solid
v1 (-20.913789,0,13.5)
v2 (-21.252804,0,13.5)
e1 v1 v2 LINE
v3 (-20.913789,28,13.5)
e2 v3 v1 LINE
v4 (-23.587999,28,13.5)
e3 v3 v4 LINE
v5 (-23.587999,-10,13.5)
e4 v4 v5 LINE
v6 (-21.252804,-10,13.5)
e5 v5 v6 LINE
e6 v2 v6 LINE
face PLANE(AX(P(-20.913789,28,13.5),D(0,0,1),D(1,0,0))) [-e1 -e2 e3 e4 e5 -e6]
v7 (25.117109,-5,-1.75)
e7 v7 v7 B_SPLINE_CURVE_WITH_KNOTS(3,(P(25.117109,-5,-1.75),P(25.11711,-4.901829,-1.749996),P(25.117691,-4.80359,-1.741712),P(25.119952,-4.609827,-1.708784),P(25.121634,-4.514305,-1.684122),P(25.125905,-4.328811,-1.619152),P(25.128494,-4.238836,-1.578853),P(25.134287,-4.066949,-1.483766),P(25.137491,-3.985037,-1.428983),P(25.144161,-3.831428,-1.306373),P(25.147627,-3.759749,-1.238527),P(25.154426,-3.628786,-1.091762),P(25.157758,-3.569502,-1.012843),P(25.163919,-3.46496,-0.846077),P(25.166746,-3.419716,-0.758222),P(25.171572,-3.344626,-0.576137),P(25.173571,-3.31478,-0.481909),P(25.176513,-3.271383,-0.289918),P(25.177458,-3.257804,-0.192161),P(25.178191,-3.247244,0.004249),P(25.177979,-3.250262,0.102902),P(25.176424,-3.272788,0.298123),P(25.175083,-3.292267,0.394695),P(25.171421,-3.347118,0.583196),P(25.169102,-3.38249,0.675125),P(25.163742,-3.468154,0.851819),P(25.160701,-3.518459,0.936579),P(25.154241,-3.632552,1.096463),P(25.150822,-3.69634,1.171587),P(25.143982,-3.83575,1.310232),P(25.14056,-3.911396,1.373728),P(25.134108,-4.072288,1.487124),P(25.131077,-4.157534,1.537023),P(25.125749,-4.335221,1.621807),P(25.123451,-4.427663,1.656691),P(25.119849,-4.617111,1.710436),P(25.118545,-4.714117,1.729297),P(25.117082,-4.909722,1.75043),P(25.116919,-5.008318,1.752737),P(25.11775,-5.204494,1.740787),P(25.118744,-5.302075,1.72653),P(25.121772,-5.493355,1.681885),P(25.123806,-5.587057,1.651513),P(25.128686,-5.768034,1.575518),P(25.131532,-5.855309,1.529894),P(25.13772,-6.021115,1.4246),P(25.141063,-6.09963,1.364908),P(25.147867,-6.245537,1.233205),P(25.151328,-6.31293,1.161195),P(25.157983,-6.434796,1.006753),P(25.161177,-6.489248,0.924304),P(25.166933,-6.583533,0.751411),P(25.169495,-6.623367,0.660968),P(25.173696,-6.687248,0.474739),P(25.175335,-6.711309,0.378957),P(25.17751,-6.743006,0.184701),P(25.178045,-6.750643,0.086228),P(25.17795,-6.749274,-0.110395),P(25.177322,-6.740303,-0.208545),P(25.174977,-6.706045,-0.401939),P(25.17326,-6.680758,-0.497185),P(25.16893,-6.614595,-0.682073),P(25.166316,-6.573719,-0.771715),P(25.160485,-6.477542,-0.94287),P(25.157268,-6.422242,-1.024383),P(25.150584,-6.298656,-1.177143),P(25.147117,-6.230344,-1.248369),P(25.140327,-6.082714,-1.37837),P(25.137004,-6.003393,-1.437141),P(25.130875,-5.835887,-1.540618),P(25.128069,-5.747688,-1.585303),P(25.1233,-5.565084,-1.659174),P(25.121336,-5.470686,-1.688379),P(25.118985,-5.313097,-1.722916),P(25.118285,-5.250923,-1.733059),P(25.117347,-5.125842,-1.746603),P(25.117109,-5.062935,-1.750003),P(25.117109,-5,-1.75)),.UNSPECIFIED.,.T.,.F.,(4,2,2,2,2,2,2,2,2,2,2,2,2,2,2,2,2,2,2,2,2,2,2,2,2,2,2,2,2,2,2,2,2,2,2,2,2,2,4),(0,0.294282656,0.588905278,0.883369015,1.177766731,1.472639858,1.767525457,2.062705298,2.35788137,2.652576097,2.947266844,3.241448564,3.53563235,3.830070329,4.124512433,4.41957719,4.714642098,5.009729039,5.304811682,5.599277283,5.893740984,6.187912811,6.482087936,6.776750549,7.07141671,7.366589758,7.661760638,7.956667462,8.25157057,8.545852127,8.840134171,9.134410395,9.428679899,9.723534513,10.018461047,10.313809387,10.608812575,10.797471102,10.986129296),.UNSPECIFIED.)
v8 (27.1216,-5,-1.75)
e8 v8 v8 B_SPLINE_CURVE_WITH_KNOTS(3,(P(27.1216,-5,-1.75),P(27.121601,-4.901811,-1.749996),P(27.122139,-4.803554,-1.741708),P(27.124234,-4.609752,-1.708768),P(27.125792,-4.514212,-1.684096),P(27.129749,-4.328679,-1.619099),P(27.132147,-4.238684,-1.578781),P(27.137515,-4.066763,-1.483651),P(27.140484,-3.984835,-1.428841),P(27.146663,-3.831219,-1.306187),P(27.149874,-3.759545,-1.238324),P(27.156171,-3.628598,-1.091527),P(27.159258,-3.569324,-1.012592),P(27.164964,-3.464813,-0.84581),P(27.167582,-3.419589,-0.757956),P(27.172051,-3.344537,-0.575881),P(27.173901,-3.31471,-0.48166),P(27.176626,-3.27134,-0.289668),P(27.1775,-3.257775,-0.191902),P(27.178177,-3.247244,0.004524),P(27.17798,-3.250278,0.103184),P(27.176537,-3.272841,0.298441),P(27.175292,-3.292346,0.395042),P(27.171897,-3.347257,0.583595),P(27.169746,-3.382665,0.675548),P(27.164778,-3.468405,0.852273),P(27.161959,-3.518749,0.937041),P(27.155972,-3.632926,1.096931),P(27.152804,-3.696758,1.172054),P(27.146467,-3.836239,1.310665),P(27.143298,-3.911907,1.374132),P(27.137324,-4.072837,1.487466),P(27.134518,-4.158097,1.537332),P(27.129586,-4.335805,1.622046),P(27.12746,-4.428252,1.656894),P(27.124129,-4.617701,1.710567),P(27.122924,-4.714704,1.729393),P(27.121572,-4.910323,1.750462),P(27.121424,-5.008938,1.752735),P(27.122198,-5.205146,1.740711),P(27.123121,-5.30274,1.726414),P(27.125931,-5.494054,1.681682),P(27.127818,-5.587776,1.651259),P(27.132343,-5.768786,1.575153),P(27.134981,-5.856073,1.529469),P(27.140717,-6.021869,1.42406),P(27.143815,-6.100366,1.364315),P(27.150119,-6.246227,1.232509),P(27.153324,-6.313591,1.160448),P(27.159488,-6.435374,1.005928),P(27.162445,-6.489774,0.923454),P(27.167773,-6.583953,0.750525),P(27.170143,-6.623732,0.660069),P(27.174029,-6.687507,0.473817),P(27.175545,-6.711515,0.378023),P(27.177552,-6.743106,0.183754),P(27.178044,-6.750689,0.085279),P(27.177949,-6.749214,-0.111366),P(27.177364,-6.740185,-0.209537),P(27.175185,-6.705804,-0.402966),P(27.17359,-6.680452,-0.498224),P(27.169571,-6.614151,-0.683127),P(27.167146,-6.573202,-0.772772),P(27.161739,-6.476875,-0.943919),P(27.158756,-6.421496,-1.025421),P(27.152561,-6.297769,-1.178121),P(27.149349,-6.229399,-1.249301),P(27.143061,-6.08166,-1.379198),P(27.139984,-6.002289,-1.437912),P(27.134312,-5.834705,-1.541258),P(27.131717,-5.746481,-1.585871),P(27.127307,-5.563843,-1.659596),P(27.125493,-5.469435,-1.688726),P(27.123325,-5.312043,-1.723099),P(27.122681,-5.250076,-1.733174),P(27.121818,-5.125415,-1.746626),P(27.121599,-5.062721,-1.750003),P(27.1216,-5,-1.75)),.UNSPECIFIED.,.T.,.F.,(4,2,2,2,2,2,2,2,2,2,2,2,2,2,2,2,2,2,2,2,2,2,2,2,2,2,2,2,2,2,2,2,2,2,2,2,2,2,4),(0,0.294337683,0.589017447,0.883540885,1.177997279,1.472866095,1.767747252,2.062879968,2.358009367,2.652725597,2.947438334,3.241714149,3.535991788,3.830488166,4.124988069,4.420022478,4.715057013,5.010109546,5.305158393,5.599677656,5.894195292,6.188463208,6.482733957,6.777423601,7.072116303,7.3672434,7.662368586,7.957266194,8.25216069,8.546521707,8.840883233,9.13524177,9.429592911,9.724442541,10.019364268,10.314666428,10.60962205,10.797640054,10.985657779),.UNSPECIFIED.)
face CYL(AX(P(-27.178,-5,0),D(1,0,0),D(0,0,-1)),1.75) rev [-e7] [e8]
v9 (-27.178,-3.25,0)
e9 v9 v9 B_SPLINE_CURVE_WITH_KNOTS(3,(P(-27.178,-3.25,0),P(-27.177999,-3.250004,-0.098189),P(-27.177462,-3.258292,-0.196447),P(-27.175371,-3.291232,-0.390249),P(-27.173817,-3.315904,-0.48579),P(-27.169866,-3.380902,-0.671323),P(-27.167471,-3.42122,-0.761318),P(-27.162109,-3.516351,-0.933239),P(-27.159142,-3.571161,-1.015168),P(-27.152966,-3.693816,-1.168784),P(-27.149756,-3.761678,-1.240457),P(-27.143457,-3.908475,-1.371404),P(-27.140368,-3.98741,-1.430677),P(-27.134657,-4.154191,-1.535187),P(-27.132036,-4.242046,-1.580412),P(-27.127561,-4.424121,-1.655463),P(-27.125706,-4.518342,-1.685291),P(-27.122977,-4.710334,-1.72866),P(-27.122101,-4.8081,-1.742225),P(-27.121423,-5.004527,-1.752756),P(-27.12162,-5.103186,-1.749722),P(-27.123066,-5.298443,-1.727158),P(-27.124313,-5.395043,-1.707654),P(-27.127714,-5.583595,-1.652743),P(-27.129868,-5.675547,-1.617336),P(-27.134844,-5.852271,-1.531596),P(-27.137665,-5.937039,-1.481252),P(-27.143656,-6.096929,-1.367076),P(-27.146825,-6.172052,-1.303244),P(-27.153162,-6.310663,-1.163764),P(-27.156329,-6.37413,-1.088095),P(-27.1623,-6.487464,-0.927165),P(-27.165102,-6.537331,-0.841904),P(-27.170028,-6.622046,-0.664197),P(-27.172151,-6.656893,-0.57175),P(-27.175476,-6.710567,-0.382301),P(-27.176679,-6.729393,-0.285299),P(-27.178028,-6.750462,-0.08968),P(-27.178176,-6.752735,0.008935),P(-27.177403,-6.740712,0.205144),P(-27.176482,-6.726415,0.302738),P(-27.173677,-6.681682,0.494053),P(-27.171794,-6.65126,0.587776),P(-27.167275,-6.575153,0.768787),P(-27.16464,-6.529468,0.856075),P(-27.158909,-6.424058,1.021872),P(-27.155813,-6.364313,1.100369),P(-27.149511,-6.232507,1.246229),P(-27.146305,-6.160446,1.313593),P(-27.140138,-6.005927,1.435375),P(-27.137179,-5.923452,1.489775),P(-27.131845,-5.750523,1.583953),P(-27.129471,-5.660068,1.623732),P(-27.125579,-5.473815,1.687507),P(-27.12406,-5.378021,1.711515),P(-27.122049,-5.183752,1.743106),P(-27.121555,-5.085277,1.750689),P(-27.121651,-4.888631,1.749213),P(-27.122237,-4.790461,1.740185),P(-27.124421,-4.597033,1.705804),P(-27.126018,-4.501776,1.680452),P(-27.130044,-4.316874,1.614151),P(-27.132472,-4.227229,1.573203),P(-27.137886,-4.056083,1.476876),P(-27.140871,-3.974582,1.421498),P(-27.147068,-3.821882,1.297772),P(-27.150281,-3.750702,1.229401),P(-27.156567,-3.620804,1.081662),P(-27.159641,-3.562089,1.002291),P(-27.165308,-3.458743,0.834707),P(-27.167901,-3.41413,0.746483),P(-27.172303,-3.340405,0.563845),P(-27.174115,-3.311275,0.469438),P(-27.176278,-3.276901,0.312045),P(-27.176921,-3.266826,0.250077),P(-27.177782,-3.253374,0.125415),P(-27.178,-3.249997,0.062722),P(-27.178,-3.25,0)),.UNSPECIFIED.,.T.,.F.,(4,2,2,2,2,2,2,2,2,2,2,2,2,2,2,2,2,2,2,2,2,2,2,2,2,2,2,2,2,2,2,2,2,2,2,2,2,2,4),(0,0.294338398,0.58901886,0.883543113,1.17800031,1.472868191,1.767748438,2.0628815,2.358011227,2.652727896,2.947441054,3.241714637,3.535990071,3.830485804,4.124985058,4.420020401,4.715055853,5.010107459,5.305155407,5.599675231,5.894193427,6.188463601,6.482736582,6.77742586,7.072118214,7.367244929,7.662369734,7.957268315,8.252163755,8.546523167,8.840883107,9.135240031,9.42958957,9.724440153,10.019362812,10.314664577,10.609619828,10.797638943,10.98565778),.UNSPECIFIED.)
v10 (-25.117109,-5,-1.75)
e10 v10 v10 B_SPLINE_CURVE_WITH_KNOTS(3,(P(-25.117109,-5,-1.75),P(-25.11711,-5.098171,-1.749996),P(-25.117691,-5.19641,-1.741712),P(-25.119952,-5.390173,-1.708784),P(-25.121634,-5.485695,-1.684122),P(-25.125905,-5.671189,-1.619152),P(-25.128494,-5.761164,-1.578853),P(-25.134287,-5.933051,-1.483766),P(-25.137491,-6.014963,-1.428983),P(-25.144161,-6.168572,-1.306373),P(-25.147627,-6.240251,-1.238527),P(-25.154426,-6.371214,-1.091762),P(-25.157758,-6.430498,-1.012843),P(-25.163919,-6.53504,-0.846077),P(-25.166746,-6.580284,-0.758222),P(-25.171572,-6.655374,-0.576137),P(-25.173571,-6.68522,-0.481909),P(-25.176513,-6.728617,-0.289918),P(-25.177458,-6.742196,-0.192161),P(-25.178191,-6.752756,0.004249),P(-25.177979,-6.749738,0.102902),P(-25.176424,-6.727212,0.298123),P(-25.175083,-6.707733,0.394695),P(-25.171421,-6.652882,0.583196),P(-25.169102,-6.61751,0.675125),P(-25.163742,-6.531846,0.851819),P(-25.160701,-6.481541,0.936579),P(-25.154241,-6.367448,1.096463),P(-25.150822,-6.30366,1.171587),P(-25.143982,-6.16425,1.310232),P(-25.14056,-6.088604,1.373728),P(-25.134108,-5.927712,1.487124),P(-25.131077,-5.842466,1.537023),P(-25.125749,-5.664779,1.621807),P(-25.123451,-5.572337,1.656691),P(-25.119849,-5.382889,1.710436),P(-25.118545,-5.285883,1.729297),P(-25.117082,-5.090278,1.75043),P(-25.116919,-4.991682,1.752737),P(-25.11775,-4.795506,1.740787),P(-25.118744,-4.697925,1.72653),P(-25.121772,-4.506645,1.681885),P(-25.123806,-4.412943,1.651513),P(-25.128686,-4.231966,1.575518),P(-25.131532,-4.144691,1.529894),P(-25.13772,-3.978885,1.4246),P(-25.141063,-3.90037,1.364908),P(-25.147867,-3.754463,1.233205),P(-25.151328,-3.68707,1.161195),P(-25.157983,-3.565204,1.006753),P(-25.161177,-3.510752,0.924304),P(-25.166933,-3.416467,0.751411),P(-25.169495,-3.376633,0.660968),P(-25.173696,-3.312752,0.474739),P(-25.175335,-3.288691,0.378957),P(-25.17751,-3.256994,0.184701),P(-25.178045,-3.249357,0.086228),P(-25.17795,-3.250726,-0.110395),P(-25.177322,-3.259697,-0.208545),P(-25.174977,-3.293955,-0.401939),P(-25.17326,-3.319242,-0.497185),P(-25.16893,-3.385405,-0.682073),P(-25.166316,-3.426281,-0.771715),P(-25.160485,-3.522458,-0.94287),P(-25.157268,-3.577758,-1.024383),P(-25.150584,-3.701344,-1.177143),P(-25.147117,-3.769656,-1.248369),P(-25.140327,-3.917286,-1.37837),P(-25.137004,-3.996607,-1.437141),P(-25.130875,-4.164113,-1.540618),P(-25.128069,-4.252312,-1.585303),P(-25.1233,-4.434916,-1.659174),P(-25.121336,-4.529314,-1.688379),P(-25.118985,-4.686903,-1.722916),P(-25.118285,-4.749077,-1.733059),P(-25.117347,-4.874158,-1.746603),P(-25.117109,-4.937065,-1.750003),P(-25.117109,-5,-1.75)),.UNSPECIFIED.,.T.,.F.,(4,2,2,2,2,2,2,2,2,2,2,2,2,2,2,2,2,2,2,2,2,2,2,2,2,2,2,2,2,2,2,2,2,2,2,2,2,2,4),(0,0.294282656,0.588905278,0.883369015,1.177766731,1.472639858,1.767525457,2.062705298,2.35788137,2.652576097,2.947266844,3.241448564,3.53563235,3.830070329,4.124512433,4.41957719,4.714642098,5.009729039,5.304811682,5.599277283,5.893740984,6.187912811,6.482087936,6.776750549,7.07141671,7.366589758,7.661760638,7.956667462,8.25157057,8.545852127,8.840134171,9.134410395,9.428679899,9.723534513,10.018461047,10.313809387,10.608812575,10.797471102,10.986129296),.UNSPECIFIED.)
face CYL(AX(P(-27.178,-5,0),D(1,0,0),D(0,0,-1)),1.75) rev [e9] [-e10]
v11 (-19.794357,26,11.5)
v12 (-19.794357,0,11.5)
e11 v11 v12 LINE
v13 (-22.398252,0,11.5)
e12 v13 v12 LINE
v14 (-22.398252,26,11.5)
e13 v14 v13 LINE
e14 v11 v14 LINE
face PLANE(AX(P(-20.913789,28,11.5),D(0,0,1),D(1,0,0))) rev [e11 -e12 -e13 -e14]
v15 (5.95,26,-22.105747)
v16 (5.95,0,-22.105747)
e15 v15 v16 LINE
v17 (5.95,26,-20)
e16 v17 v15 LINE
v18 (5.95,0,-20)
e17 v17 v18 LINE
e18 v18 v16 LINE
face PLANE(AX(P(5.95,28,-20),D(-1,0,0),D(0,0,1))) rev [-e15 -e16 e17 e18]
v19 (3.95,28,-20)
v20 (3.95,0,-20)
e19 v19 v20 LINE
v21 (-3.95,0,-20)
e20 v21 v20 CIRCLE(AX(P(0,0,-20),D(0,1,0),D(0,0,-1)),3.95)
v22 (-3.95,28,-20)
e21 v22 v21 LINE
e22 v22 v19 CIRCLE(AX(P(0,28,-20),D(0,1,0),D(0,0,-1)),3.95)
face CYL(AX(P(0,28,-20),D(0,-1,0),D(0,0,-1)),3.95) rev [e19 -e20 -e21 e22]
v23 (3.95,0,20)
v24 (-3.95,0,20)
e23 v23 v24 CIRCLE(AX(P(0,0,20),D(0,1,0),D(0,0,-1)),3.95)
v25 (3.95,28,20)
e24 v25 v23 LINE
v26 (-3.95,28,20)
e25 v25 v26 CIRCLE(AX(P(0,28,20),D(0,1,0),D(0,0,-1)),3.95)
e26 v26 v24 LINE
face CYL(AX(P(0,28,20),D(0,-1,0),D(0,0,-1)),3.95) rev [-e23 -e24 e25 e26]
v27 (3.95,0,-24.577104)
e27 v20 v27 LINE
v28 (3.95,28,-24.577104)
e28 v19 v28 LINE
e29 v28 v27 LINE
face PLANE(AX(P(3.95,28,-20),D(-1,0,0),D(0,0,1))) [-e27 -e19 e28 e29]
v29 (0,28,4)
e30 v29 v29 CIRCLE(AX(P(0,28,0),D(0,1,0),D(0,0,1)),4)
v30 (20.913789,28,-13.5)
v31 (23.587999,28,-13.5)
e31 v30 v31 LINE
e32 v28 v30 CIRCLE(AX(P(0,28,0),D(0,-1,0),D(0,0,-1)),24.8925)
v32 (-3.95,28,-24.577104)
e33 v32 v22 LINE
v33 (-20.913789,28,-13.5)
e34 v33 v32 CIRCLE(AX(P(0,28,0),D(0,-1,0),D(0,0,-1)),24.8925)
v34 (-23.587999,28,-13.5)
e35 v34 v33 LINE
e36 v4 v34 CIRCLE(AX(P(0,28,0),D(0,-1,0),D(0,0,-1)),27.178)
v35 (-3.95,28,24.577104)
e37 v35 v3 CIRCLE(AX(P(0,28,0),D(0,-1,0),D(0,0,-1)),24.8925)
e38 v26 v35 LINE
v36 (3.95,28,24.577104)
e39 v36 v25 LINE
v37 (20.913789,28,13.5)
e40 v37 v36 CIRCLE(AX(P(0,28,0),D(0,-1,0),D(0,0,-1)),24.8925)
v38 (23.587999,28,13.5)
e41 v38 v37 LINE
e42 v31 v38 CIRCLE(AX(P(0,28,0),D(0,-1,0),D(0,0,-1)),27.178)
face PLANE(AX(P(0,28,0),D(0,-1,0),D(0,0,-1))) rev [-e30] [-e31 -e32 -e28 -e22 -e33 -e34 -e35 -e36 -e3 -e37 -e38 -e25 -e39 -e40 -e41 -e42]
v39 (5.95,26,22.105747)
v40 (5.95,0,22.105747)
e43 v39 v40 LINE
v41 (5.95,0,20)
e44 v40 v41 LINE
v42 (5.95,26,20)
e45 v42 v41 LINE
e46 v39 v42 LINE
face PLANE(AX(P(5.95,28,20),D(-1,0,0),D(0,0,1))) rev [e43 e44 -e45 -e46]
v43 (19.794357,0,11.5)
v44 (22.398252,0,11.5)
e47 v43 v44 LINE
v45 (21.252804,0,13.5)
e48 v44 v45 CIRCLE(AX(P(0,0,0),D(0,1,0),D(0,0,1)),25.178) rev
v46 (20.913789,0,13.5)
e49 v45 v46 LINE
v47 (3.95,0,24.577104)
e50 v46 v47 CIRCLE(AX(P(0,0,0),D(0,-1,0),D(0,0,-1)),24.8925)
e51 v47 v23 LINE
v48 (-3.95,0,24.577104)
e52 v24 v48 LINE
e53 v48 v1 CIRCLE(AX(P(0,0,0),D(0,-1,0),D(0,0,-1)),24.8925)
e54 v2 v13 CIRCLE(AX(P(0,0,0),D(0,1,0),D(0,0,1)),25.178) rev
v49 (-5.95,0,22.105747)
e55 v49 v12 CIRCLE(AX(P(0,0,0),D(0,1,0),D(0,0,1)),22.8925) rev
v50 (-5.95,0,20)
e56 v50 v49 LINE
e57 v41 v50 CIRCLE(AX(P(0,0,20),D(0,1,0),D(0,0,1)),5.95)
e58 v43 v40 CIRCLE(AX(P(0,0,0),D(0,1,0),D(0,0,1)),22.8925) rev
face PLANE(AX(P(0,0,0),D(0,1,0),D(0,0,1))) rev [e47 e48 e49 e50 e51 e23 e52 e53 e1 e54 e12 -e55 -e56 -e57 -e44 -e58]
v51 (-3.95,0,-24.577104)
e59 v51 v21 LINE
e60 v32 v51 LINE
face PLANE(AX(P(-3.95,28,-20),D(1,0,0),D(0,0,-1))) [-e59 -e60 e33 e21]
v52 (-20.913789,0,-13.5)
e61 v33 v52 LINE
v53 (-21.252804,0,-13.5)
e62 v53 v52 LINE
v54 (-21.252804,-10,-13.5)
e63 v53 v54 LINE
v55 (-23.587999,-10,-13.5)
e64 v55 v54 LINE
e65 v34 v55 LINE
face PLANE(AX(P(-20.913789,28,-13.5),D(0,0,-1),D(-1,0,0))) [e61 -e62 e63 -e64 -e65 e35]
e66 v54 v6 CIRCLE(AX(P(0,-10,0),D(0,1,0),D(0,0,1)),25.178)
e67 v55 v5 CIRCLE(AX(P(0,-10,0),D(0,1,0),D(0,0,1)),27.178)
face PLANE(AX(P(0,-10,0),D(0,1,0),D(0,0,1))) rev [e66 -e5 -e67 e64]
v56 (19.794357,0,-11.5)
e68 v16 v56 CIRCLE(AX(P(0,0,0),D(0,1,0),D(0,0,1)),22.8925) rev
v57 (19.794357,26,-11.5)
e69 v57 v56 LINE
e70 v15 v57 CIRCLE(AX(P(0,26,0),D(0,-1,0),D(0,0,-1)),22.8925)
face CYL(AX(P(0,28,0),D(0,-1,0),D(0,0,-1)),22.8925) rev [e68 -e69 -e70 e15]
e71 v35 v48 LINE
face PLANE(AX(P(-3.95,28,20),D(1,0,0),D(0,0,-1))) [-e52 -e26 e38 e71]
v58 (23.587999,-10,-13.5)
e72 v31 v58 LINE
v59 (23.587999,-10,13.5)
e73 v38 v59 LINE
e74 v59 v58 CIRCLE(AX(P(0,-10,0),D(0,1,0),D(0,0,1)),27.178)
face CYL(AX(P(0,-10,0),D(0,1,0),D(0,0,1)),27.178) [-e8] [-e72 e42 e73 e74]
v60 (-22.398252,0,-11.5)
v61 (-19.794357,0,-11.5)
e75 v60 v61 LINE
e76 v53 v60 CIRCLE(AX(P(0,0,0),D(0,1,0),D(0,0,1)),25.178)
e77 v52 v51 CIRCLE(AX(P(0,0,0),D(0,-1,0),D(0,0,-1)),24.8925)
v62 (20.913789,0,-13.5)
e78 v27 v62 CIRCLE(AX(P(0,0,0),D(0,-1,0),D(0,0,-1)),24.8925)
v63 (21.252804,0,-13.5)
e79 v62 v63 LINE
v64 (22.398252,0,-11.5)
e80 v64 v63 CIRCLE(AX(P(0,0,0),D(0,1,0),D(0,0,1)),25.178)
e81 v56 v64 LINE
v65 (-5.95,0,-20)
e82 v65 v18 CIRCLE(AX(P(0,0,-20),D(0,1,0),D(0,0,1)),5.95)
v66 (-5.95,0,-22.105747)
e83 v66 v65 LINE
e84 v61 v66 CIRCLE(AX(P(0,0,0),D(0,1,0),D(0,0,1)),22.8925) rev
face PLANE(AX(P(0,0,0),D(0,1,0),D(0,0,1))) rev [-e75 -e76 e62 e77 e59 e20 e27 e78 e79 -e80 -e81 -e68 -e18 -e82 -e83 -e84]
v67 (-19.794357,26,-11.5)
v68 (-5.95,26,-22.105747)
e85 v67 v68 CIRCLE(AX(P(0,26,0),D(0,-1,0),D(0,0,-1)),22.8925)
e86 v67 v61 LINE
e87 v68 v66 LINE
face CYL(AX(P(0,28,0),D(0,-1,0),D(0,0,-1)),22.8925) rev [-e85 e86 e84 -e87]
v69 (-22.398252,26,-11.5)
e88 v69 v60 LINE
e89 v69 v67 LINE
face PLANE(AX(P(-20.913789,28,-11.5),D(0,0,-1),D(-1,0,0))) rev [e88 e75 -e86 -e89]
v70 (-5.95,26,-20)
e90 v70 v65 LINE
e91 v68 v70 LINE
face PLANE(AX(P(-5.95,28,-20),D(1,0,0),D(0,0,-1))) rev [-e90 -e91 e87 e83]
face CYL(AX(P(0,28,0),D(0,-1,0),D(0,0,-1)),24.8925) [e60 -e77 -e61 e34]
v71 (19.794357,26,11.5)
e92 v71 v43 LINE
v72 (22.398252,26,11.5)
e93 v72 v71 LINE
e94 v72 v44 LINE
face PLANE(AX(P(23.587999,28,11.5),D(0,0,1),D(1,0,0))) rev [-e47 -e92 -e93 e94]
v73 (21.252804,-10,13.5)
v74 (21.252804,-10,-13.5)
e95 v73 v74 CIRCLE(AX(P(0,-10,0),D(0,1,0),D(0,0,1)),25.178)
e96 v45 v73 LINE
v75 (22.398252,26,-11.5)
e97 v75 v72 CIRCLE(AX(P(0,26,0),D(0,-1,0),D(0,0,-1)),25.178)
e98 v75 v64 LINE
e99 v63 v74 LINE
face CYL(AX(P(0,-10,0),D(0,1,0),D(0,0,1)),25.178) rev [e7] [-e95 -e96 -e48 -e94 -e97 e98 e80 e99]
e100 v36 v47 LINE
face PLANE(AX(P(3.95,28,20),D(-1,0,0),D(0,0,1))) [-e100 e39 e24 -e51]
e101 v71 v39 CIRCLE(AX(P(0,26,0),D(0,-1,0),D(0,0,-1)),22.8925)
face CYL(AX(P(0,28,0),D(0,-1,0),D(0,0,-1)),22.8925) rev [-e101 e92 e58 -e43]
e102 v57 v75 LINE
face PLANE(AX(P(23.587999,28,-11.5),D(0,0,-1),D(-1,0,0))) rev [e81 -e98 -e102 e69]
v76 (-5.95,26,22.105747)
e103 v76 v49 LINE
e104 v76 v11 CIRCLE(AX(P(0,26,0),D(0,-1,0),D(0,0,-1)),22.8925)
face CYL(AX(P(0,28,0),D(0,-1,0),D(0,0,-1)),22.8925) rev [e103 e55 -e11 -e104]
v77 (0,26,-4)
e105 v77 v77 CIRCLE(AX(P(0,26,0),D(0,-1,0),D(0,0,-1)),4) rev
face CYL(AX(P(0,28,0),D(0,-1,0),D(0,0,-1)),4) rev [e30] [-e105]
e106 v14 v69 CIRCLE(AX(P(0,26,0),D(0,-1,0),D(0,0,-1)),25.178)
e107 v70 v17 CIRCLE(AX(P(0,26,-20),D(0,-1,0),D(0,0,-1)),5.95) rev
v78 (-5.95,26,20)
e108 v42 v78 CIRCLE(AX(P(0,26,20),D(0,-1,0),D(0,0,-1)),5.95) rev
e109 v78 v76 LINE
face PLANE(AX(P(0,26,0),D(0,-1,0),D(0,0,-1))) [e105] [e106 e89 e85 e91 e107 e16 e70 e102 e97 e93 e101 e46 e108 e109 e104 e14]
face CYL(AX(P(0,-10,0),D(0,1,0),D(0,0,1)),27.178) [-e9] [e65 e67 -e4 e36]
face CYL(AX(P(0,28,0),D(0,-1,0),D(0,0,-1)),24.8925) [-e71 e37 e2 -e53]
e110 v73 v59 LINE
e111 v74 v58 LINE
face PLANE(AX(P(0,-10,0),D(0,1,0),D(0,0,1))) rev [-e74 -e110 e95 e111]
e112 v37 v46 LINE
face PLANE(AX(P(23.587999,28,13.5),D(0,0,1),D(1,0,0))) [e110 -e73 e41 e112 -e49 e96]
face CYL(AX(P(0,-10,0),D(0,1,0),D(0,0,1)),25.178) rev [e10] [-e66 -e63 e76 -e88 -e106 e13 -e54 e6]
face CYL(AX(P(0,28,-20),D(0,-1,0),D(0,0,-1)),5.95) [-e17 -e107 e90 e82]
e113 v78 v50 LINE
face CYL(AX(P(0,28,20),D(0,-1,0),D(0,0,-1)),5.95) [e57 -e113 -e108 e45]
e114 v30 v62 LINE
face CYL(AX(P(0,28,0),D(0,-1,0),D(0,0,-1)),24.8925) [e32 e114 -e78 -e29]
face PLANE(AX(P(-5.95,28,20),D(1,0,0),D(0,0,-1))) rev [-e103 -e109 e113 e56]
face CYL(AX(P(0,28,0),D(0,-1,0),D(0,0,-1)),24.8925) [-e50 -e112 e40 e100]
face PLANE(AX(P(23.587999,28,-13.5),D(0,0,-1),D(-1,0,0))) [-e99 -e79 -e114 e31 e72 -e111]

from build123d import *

# Parameters (mm, degrees)
SKETCH2_R               = 27.178
BOSS_EXTRUDE1_DEPTH     = 10
BOSS_EXTRUDE2_START     = -28
BOSS_EXTRUDE2_DEPTH     = 28
SHELL1_START            = -10
SHELL1_DEPTH            = 36
SHELL1_2_DEPTH          = 8
CUT_EXTRUDE3_DEPTH      = 10
CUT_EXTRUDE4_DEPTH      = 47.115916344
CUT_EXTRUDE4_DEPTH_BACK = 47.115916344
SKETCH6_R               = 1.75
SKETCH7_R               = 4
CUT_EXTRUDE6_DEPTH      = 47.115916478


# Read off the part's stored shape, not the designer's step: Shell1
with BuildPart() as part:
    # Sketch2 → Boss-Extrude1 (new body)
    with BuildSketch(Plane(origin=(0, 0, 0), x_dir=(1, 0, 0), z_dir=(0, 1, 0))):
        with Locations(Location((0, 0, 0), (0, 0, 270))):
            Circle(SKETCH2_R)
    extrude(amount=-BOSS_EXTRUDE1_DEPTH)

    # Sketch3 → Boss-Extrude2 (add)
    with BuildSketch(Plane(origin=(0, 0, 0), x_dir=(-1, 0, 0), z_dir=(0, -1, 0)).offset(BOSS_EXTRUDE2_START)):
        with BuildLine():
            Line((-23.587998728, 13.5), (-20.913788663, 13.5))
            ThreePointArc((-20.913788663, 13.5), (-13.609833087, 20.842480649), (-3.95, 24.57710431))
            Line((-3.95, 24.57710431), (-3.95, 20))
            ThreePointArc((-3.95, 20), (0, 16.05), (3.95, 20))
            Line((3.95, 20), (3.95, 24.57710431))
            ThreePointArc((3.95, 24.57710431), (13.609833087, 20.842480649), (20.913788663, 13.5))
            Line((20.913788663, 13.5), (23.587998728, 13.5))
            ThreePointArc((23.587998728, 13.5), (27.178, 0), (23.587998728, -13.5))
            Line((23.587998728, -13.5), (20.913788663, -13.5))
            ThreePointArc((20.913788663, -13.5), (13.609833087, -20.842480649), (3.95, -24.57710431))
            Line((3.95, -24.57710431), (3.95, -20))
            ThreePointArc((3.95, -20), (0, -16.05), (-3.95, -20))
            Line((-3.95, -20), (-3.95, -24.57710431))
            ThreePointArc((-3.95, -24.57710431), (-13.609833087, -20.842480649), (-20.913788663, -13.5))
            Line((-20.913788663, -13.5), (-23.587998728, -13.5))
            ThreePointArc((-23.587998728, -13.5), (-27.178, 0), (-23.587998728, 13.5))
        make_face()
    extrude(amount=BOSS_EXTRUDE2_DEPTH)

    # Shell1 outline → Shell1 (cut)
    with BuildSketch(Plane(origin=(0, 0, 0), x_dir=(1, 0, 0), z_dir=(0, 1, 0)).offset(SHELL1_START)):
        with BuildLine():
            ThreePointArc((22.398251807, -11.5), (25.178, 0), (22.398251807, 11.5))
            Line((22.398251807, 11.5), (19.794356677, 11.5))
            ThreePointArc((19.794356677, 11.5), (13.921689669, 18.172867496), (5.95, 22.105747132))
            Line((5.95, 22.105747132), (5.95, 20))
            ThreePointArc((5.95, 20), (0, 14.05), (-5.95, 20))
            Line((-5.95, 20), (-5.95, 22.105747132))
            ThreePointArc((-5.95, 22.105747132), (-13.921689669, 18.172867496), (-19.794356677, 11.5))
            Line((-19.794356677, 11.5), (-22.398251807, 11.5))
            ThreePointArc((-22.398251807, 11.5), (-25.178, 0), (-22.398251807, -11.5))
            Line((-22.398251807, -11.5), (-19.794356677, -11.5))
            ThreePointArc((-19.794356677, -11.5), (-13.921689669, -18.172867496), (-5.95, -22.105747132))
            Line((-5.95, -22.105747132), (-5.95, -20))
            ThreePointArc((-5.95, -20), (0, -14.05), (5.95, -20))
            Line((5.95, -20), (5.95, -22.105747132))
            ThreePointArc((5.95, -22.105747132), (13.921689669, -18.172867496), (19.794356677, -11.5))
            Line((19.794356677, -11.5), (22.398251807, -11.5))
        make_face()
    extrude(amount=SHELL1_DEPTH, mode=Mode.SUBTRACT)

    # Shell1 2 outline → Shell1 2 (cut)
    with BuildSketch(Plane(origin=(0, 0, 0), x_dir=(1, 0, 0), z_dir=(0, 1, 0)).offset(SHELL1_START)):
        with BuildLine():
            Line((19.794356677, 11.5), (22.398251807, 11.5))
            ThreePointArc((22.398251807, 11.5), (0, 25.178), (-22.398251807, 11.5))
            Line((-22.398251807, 11.5), (-19.794356677, 11.5))
            ThreePointArc((-19.794356677, 11.5), (-13.921689669, 18.172867496), (-5.95, 22.105747132))
            Line((-5.95, 22.105747132), (-5.95, 20))
            ThreePointArc((-5.95, 20), (0, 14.05), (5.95, 20))
            Line((5.95, 20), (5.95, 22.105747132))
            ThreePointArc((5.95, 22.105747132), (13.921689669, 18.172867496), (19.794356677, 11.5))
        make_face()
        with BuildLine():
            ThreePointArc((-22.398251807, -11.5), (0, -25.178), (22.398251807, -11.5))
            Line((22.398251807, -11.5), (19.794356677, -11.5))
            ThreePointArc((19.794356677, -11.5), (13.921689669, -18.172867496), (5.95, -22.105747132))
            Line((5.95, -22.105747132), (5.95, -20))
            ThreePointArc((5.95, -20), (0, -14.05), (-5.95, -20))
            Line((-5.95, -20), (-5.95, -22.105747132))
            ThreePointArc((-5.95, -22.105747132), (-13.921689669, -18.172867496), (-19.794356677, -11.5))
            Line((-19.794356677, -11.5), (-22.398251807, -11.5))
        make_face()
    extrude(amount=SHELL1_2_DEPTH, mode=Mode.SUBTRACT)

    # Sketch5 → Cut-Extrude3 (cut)
    with BuildSketch(Plane(origin=(0, -10, 0), x_dir=(1, 0, 0), z_dir=(0, 1, 0))):
        with BuildLine():
            Line((-23.587998728, 13.5), (-21.252804144, 13.5))
            ThreePointArc((-21.252804144, 13.5), (-21.848424918, 12.513113625), (-22.398251807, 11.5))
            Line((-22.398251807, 11.5), (22.398251807, 11.5))
            ThreePointArc((22.398251807, 11.5), (21.848424918, 12.513113625), (21.252804144, 13.5))
            Line((21.252804144, 13.5), (23.587998728, 13.5))
            ThreePointArc((23.587998728, 13.5), (0, 27.178), (-23.587998728, 13.5))
        make_face()
    cut_extrude3 = extrude(amount=CUT_EXTRUDE3_DEPTH, mode=Mode.SUBTRACT)

    # Mirror1: Cut-Extrude3 across plane
    add(cut_extrude3.mirror(Plane.XY), mode=Mode.SUBTRACT)

    # Sketch6 → Cut-Extrude4 (cut, two sides: drawn at the far end of the back side and taken through both)
    with BuildSketch(Plane(origin=(0, 0, 0), x_dir=(0, 0, -1), z_dir=(1, 0, 0)).offset(-CUT_EXTRUDE4_DEPTH_BACK)):
        with Locations((0, -5)):
            Circle(SKETCH6_R)
    extrude(amount=CUT_EXTRUDE4_DEPTH + CUT_EXTRUDE4_DEPTH_BACK, mode=Mode.SUBTRACT)

    # Sketch7 → Cut-Extrude6 (cut, through all)
    with BuildSketch(Plane(origin=(0, 0, 0), x_dir=(1, 0, 0), z_dir=(0, 1, 0))):
        with Locations(Location((0, 0, 0), (0, 0, 90))):
            Circle(SKETCH7_R)
    extrude(amount=CUT_EXTRUDE6_DEPTH, mode=Mode.SUBTRACT)


solid = part.part
